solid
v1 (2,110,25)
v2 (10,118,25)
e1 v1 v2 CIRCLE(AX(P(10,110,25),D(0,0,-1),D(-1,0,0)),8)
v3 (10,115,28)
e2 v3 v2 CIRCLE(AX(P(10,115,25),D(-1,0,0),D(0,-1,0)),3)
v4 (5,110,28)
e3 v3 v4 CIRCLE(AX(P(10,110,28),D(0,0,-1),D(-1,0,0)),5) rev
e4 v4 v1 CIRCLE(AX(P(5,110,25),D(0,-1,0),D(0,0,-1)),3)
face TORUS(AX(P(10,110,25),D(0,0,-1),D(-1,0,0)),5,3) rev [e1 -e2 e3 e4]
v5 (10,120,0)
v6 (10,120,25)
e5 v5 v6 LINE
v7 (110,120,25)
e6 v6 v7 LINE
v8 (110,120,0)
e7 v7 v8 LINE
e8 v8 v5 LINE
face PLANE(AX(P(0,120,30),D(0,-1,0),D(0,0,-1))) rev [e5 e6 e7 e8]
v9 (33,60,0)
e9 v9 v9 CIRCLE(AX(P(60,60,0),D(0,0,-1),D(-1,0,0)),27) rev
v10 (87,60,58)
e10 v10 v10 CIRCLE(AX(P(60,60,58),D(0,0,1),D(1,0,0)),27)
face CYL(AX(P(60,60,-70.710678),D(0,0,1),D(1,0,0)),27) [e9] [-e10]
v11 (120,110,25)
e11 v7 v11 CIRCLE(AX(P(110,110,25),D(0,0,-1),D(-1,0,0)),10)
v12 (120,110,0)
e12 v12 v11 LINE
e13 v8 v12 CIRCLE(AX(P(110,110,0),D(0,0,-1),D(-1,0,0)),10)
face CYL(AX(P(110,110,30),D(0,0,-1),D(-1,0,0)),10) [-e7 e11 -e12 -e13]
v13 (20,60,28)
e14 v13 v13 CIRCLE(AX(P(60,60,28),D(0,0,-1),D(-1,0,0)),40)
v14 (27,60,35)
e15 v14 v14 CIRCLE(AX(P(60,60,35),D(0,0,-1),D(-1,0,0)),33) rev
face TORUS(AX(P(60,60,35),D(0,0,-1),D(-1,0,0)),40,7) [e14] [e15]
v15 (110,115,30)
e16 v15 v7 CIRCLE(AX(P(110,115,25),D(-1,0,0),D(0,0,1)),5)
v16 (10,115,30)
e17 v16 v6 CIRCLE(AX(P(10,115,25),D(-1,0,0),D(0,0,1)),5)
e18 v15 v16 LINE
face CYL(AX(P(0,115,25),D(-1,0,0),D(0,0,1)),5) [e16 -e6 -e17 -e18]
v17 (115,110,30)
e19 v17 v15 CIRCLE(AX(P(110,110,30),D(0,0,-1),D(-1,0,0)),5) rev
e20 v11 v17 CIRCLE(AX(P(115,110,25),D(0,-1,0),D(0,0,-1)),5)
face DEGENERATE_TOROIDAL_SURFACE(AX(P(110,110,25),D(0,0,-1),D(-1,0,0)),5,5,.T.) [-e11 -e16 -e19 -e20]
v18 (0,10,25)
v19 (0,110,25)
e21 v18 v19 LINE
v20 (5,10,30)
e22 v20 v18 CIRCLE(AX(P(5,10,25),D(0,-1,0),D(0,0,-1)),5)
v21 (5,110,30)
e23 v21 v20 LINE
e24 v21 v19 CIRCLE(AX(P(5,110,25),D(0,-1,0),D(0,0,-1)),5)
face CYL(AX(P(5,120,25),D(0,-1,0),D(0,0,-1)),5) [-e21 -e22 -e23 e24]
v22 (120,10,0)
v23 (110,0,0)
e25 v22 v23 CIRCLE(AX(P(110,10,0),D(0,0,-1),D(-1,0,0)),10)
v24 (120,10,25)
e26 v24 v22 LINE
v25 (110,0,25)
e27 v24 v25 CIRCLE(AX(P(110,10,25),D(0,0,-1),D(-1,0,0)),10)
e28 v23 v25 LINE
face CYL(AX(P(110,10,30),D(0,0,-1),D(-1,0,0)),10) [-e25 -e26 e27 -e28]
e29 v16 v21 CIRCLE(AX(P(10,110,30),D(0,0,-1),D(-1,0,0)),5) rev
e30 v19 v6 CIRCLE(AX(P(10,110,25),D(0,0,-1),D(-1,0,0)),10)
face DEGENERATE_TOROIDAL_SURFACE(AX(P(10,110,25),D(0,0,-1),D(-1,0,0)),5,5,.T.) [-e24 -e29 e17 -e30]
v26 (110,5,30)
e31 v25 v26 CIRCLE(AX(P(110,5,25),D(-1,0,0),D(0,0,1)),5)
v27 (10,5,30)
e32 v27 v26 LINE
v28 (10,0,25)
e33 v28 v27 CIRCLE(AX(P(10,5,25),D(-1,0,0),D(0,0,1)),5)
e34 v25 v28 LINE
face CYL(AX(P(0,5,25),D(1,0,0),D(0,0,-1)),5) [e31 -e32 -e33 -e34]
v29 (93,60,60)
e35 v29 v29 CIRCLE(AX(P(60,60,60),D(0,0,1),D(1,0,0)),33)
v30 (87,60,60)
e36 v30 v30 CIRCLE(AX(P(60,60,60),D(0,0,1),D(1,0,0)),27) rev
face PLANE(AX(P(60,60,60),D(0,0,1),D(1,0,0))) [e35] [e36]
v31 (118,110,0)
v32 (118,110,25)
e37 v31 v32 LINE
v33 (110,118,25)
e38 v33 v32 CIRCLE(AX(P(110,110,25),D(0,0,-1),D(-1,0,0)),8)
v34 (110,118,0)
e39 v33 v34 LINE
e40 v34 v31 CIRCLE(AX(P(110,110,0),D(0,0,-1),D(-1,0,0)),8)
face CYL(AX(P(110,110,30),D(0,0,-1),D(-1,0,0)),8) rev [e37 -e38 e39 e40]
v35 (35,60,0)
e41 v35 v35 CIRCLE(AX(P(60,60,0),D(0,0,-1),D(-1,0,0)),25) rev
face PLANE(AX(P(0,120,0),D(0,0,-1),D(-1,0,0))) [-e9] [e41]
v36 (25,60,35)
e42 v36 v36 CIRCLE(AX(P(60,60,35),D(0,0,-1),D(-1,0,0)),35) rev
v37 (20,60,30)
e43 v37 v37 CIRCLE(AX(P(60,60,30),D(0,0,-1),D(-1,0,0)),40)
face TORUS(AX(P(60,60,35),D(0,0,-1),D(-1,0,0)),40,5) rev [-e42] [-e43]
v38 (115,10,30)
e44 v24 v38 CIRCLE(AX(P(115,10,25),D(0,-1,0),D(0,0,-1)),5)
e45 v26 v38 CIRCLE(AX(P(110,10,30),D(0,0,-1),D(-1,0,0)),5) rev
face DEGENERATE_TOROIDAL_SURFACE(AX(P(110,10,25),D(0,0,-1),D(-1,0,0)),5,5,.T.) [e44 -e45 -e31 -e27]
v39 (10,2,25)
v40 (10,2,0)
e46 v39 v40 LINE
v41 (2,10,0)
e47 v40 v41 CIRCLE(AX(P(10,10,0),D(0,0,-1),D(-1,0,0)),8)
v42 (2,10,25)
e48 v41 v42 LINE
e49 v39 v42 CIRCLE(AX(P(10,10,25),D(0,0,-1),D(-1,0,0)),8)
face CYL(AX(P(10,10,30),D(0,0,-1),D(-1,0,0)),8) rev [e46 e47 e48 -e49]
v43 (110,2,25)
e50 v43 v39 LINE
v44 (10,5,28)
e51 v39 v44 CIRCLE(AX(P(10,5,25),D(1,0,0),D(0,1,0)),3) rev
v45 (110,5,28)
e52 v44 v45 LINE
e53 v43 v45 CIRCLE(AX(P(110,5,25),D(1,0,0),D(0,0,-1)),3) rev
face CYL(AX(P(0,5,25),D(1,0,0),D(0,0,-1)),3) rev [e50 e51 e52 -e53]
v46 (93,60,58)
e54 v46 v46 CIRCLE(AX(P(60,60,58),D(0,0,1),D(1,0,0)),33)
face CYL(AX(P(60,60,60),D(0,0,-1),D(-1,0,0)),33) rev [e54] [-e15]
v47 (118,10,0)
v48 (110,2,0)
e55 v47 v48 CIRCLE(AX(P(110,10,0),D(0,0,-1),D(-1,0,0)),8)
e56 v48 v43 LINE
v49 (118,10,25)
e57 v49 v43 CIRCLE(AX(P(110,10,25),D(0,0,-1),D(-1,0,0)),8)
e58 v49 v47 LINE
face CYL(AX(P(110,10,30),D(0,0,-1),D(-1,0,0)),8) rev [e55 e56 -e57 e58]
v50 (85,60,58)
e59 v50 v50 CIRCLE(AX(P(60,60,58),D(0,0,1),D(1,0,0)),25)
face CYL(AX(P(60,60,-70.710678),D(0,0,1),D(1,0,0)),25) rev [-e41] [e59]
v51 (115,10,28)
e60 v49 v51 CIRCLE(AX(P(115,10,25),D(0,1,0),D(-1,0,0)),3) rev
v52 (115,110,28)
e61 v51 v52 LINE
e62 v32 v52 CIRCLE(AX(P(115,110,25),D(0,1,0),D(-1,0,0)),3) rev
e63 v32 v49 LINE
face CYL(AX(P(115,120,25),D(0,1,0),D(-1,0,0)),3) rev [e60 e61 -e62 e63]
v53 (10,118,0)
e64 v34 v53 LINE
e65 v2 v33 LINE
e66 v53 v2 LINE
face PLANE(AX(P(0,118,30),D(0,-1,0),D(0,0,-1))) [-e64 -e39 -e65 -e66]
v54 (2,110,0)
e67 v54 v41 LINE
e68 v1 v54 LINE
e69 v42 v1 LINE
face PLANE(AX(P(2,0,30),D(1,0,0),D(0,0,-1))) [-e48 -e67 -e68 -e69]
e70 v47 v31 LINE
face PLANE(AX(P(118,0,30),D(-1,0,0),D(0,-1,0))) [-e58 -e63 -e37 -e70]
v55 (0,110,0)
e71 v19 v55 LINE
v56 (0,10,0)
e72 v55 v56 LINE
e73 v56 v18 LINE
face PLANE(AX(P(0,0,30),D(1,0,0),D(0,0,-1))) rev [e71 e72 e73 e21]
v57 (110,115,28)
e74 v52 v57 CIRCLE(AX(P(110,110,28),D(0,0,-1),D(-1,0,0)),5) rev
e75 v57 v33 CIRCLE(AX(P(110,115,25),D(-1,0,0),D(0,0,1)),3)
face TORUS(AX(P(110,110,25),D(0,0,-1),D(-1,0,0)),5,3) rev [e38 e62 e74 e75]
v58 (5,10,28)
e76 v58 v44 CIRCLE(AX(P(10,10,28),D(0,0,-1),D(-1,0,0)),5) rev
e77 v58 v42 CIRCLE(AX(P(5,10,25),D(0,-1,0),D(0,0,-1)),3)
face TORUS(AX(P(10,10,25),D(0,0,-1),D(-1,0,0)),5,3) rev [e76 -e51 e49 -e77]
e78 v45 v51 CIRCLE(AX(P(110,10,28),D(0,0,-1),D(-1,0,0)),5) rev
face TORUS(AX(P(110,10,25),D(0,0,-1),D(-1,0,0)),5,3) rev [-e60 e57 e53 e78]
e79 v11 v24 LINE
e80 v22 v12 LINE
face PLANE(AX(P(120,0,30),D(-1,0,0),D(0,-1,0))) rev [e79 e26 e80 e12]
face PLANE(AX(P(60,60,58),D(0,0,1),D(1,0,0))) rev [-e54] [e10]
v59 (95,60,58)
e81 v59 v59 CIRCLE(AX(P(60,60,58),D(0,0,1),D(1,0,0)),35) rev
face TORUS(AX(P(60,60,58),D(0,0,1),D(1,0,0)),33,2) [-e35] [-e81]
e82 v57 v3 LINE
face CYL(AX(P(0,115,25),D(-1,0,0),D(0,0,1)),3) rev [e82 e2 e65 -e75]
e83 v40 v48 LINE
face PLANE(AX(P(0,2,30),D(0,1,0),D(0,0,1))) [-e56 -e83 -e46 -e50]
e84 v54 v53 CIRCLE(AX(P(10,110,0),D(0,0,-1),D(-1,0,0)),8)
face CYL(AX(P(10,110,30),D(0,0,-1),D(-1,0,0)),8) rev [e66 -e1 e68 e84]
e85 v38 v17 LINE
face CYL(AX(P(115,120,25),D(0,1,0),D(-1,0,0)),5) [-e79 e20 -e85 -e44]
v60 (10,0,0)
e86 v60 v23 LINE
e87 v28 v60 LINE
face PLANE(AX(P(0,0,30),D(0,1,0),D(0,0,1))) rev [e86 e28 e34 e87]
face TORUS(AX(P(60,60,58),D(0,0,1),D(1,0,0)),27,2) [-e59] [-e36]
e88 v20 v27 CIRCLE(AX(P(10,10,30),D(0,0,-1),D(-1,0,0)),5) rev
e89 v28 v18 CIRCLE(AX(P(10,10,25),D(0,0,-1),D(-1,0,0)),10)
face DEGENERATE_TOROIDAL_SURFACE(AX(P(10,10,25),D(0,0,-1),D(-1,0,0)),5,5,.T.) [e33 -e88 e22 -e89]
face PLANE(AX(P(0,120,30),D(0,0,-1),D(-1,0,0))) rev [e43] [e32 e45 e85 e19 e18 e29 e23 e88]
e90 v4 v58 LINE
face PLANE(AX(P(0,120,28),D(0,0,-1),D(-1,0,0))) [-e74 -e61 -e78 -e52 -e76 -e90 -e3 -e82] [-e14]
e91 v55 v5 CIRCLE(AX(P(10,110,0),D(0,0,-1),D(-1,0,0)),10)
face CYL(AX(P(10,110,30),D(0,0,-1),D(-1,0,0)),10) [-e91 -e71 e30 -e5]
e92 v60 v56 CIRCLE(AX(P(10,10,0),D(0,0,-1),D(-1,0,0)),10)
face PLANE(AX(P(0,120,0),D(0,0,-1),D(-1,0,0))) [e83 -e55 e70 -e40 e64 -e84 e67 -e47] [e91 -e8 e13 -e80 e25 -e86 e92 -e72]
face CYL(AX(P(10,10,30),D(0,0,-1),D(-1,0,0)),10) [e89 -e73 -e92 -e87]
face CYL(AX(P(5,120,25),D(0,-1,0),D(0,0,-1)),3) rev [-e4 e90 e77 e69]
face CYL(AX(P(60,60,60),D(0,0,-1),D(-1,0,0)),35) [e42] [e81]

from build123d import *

# Parameters (mm, degrees)
CROQUIS1_W              = 120
CROQUIS1_H              = 120
SALIENTE_EXTRUIR1_DEPTH = 30
CROQUIS3_R              = 35
SALIENTE_EXTRUIR2_DEPTH = 30
CROQUIS4_R              = 25
CORTAR_EXTRUIR1_DEPTH   = 60
REDONDEO4_R             = 2
REDONDEO6_R             = 10
REDONDEO8_R             = 5
VACIADO1_T              = -2


with BuildPart() as part:
    # Croquis1 → Saliente-Extruir1 (new body)
    with BuildSketch(Plane.XY):
        with Locations((60, 60)):
            Rectangle(CROQUIS1_W, CROQUIS1_H)
    extrude(amount=SALIENTE_EXTRUIR1_DEPTH)

    # Croquis3 → Saliente-Extruir2 (add)
    with BuildSketch(Plane.XY.offset(30)):
        with Locations(Location((60, 60, 0), (0, 0, 180))):
            Circle(CROQUIS3_R)
    extrude(amount=SALIENTE_EXTRUIR2_DEPTH)

    # Croquis4 → Cortar-Extruir1 (cut)
    with BuildSketch(Plane.XY.offset(60)):
        with Locations((60, 60)):
            Circle(CROQUIS4_R)
    extrude(amount=-CORTAR_EXTRUIR1_DEPTH, mode=Mode.SUBTRACT)

    # Redondeo4
    redondeo4_edges = [part.edges().sort_by_distance(p)[0] for p in [
        (95, 60, 60),
        (35, 60, 60),
    ]]
    fillet(redondeo4_edges, radius=REDONDEO4_R)

    # Redondeo6
    redondeo6_edges = [part.edges().sort_by_distance(p)[0] for p in [
        (0, 120, 15),
        (120, 120, 15),
        (120, 0, 15),
        (0, 0, 15),
    ]]
    fillet(redondeo6_edges, radius=REDONDEO6_R)

    # Redondeo8
    redondeo8_edges = [part.edges().sort_by_distance(p)[0] for p in [
        (95, 60, 30),
        (120, 60, 30),
        (60, 0, 30),
        (0, 60, 30),
        (60, 120, 30),
        (117.071067812, 117.071067812, 30),
        (2.928932188, 117.071067812, 30),
        (2.928932188, 2.928932188, 30),
        (117.071067812, 2.928932188, 30),
    ]]
    fillet(redondeo8_edges, radius=REDONDEO8_R)

    # Vaciado1
    vaciado1_openings = [part.faces().sort_by_distance(p)[0] for p in [
        (60, 1.697056275, 0),
    ]]
    offset(amount=VACIADO1_T, openings=vaciado1_openings, kind=Kind.INTERSECTION)


solid = part.part
